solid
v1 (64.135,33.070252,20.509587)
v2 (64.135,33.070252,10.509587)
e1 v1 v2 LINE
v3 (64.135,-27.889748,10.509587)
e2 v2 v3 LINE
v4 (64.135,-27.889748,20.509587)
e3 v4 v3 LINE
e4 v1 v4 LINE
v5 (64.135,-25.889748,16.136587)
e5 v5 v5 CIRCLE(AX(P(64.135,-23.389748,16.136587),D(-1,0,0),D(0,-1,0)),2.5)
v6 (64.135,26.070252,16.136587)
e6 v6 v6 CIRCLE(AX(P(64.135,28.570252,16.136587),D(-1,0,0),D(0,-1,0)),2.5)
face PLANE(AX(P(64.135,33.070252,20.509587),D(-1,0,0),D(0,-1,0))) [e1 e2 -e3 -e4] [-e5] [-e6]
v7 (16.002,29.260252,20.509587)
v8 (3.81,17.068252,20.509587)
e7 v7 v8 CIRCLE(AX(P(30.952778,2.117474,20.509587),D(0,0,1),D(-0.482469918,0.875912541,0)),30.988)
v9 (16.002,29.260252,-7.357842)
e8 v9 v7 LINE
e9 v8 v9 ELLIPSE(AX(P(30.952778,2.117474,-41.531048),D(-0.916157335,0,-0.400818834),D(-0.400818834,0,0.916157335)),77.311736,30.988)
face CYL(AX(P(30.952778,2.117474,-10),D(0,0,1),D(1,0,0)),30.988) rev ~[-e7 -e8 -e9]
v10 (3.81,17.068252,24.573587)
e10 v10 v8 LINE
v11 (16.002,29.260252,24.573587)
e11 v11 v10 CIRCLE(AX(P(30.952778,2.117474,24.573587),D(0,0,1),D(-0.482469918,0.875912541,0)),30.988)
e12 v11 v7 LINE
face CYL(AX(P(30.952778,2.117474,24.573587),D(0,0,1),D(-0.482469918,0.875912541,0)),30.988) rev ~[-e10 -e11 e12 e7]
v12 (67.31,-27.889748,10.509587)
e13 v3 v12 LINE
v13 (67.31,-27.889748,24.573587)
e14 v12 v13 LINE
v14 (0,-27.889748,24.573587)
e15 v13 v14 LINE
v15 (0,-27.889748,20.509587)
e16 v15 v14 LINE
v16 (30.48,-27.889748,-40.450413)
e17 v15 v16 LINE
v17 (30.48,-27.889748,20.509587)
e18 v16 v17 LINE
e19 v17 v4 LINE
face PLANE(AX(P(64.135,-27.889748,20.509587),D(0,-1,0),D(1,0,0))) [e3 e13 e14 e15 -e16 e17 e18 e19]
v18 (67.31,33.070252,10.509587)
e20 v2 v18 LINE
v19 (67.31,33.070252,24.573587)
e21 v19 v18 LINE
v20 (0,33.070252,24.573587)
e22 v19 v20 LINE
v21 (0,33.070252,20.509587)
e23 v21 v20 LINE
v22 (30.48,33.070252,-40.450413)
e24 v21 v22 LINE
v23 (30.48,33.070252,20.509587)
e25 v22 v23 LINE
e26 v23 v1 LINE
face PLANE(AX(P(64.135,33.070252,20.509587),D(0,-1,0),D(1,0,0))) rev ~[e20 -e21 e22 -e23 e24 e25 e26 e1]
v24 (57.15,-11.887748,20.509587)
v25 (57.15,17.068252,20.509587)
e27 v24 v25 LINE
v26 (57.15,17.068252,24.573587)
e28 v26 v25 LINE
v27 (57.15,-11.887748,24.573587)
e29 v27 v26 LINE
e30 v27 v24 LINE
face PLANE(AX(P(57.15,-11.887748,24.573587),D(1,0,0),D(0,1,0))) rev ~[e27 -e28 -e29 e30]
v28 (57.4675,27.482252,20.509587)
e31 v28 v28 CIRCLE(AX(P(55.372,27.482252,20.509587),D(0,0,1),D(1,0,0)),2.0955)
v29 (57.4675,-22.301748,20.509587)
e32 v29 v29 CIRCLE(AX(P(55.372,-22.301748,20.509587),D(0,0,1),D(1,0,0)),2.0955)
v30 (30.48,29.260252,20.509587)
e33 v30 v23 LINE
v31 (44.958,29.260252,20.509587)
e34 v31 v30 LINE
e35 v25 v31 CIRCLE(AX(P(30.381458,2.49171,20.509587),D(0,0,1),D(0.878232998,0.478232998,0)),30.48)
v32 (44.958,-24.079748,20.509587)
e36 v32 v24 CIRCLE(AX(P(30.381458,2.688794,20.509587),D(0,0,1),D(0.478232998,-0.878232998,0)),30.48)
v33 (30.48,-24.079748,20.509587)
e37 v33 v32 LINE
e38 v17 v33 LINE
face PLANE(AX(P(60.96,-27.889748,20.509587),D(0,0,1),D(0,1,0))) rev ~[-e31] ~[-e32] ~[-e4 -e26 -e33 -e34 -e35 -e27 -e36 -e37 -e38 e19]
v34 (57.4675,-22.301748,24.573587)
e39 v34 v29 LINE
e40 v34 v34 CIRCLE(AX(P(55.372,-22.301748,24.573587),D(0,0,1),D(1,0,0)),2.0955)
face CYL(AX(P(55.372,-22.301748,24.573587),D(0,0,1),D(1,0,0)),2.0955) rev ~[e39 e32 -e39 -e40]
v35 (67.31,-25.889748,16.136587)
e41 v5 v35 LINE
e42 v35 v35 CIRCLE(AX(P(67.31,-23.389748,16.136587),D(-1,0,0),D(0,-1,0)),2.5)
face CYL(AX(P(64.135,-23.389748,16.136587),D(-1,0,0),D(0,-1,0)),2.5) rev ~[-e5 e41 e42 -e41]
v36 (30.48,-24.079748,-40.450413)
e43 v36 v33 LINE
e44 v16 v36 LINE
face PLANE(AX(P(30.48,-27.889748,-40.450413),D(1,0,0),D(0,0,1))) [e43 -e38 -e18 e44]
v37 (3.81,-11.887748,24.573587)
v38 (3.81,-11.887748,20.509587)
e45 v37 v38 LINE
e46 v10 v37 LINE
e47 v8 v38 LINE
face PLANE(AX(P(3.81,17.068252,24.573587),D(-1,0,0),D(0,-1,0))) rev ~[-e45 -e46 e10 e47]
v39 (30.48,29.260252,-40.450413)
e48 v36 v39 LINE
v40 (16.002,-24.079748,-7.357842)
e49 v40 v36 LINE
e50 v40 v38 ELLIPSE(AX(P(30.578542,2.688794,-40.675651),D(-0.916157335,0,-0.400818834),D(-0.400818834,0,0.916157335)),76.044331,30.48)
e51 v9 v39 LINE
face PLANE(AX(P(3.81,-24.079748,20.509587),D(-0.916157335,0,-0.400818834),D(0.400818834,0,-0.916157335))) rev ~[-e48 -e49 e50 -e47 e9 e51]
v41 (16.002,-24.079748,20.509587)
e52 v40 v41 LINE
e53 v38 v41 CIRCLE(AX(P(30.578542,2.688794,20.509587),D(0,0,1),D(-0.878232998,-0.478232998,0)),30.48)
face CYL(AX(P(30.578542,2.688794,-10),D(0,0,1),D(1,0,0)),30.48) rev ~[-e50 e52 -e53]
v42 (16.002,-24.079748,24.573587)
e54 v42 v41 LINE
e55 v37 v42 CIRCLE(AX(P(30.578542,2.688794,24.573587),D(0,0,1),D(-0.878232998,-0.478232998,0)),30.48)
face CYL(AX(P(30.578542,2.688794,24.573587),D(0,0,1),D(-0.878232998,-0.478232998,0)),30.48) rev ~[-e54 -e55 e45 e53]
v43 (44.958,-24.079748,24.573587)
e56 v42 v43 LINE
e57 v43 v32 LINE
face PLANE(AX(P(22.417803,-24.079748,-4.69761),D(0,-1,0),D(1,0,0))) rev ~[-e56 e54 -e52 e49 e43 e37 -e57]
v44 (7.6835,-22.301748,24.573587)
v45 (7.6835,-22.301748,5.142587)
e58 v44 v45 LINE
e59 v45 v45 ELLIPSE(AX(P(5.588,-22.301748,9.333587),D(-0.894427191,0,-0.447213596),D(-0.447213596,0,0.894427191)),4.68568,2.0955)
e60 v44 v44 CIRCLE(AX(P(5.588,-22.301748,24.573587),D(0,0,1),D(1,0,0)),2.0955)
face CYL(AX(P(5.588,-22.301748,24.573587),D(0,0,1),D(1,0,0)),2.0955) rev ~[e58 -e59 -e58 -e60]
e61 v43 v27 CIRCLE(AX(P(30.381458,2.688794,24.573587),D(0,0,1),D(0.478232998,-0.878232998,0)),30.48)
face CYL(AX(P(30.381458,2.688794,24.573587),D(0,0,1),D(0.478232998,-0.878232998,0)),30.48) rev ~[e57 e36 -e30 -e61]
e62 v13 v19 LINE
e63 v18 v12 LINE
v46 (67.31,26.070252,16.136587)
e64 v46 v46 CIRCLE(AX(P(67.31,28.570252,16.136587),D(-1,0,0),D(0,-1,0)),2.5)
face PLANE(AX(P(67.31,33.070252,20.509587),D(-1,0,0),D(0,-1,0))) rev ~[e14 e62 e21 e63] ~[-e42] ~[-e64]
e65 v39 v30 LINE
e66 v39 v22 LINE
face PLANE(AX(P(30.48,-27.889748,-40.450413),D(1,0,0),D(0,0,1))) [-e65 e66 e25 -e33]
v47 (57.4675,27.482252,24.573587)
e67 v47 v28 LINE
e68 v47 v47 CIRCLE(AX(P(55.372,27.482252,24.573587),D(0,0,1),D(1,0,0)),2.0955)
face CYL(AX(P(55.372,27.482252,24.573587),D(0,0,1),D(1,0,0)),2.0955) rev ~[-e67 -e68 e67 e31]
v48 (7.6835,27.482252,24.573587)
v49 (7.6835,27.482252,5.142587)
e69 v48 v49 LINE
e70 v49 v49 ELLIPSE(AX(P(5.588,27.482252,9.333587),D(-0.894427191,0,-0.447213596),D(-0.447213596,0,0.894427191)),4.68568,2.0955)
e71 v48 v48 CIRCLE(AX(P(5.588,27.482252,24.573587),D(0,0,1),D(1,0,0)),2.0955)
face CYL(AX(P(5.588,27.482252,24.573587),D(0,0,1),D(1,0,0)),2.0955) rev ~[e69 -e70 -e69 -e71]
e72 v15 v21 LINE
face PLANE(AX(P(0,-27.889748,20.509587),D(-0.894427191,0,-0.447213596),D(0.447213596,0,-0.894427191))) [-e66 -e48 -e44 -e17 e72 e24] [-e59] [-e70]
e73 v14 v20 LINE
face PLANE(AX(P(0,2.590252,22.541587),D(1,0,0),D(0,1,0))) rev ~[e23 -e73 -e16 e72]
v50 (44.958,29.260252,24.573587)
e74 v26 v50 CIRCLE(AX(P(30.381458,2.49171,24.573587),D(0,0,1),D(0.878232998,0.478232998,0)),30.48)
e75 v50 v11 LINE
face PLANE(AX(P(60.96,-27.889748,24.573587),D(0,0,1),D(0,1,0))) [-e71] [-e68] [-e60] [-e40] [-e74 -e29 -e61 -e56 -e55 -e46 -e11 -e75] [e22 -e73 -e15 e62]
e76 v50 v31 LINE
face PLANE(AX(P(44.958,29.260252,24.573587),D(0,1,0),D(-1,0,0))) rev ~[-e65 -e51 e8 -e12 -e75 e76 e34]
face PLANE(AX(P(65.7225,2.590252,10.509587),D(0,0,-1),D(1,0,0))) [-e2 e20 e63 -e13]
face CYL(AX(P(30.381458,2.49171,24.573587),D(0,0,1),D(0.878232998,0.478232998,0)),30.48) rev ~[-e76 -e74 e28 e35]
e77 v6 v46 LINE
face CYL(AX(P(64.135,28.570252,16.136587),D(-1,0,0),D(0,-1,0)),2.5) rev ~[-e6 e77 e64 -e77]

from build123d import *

# Parameters (mm, degrees)
F0_W        = 60.96
F0_H        = 4.064
F1_DEPTH    = 60.96
F3_DEPTH    = 25.4
F6_DEPTH    = 60.96
F7_T4_DEPTH = 53.34
F7_S5_R     = 30.988
F7_T6_DEPTH = 44
F7_S7_R     = 30.48
F7_T8_DEPTH = 44
F8_W        = 60.96
F8_H        = 4.064
F9_DEPTH    = 6.35
F10_W       = 3.175
F10_H       = 60.96
F11_DEPTH   = 10
F4_R        = 2.0955
F14_DEPTH   = 65.025
F13_R       = 2.5
F15_DEPTH   = 25.4
F12_R       = 2.5
F16_DEPTH   = 25.4


# Not quite as in the source:
# - a fillet or chamfer that OpenCascade refuses, or shapes differently, is made with other operations: its cross-section is extruded or revolved along the edge and cut away or added


with BuildPart() as f1:
    # F0 (on Right) → F1 (new body)
    with BuildSketch(Plane.YZ):
        with Locations((2.5902520865, 22.5415869818)):
            Rectangle(F0_W, F0_H)
    extrude(amount=F1_DEPTH)

    # F2 (on face) → F3 (cut)
    with BuildSketch(Plane.XY.offset(24.5735869818)):
        with BuildLine():
            Line((16.002, -24.0797479135), (44.958, -24.0797479135))
            ThreePointArc((44.958, -24.0797479135), (51.934072902, -18.8638208155), (57.15, -11.8877479135))
            Line((57.15, -11.8877479135), (57.15, 17.0682520865))
            ThreePointArc((57.15, 17.0682520865), (51.934072902, 24.0443249885), (44.958, 29.2602520865))
            Line((44.958, 29.2602520865), (16.002, 29.2602520865))
            ThreePointArc((16.002, 29.2602520865), (9.0409528702, 24.0292992163), (3.81, 17.0682520865))
            Line((3.81, 17.0682520865), (3.81, -11.8877479135))
            ThreePointArc((3.81, -11.8877479135), (9.025927098, -18.8638208155), (16.002, -24.0797479135))
        make_face()
    extrude(amount=-F3_DEPTH, mode=Mode.SUBTRACT)

    # F5 (on face) → F6 (join)
    with BuildSketch(Plane.XZ.offset(27.8897479135)):
        Polygon((30.48, -40.4504130182), (30.48, 20.5095869818), (0, 20.5095869818), align=None)
    extrude(amount=-F6_DEPTH)

    # F7: chamfer of 60.96 x 26.67 on 1 edges, made by hand


with BuildPart() as f7_tool2:
    # F7_s3 → F7_t4 (new body)
    with BuildSketch(Plane.XZ.offset(24.0797479135)):
        Polygon((3.81, 20.5095869818), (30.48, -40.4504130182), (30.48, 20.5095869818), align=None)
    extrude(amount=-F7_T4_DEPTH)

    # F7_s5 → F7_t6 (intersect, symmetric)
    with BuildSketch(Plane.XY.offset(-10)):
        with Locations((30.9527778056, 2.1174742809)):
            Circle(F7_S5_R)
    extrude(amount=F7_T6_DEPTH, both=True, mode=Mode.INTERSECT)

    # F7_s7 → F7_t8 (intersect, symmetric)
    with BuildSketch(Plane.XY.offset(-10)):
        with Locations((30.5785417886, 2.6887938751)):
            Circle(F7_S7_R)
    extrude(amount=F7_T8_DEPTH, both=True, mode=Mode.INTERSECT)


with BuildPart() as f1_1:
    add(f1.part)

    # F7_t1: cut F7_tool2
    add(f7_tool2.part, mode=Mode.SUBTRACT)

    # F8 (on face) → F9 (join)
    with BuildSketch(Plane.YZ.offset(60.96)):
        with Locations((2.5902520865, 22.5415869818)):
            Rectangle(F8_W, F8_H)
    extrude(amount=F9_DEPTH)

    # F10 (on face) → F11 (join)
    with BuildSketch(Plane(origin=(0, 0, 20.5095869818), x_dir=(1, 0, 0), z_dir=(0, 0, -1))):
        with Locations((65.7225, -2.5902520865)):
            Rectangle(F10_W, F10_H)
    extrude(amount=F11_DEPTH)

    # F4 (on face) → F14 (cut, through all)
    with BuildSketch(Plane.XY.offset(24.5735869818)):
        with Locations((55.372, -22.3017479135)):
            Circle(F4_R)
        with Locations((55.372, 27.4822520865)):
            Circle(F4_R)
        with Locations((5.588, -22.3017479135)):
            Circle(F4_R)
        with Locations((5.588, 27.4822520865)):
            Circle(F4_R)
    extrude(amount=-F14_DEPTH, mode=Mode.SUBTRACT)

    # F13 (on face) → F15 (cut)
    with BuildSketch(Plane(origin=(64.135, 0, 0), x_dir=(0, -1, 0), z_dir=(-1, 0, 0))):
        with Locations((23.3897479135, 16.1365869818)):
            Circle(F13_R)
    extrude(amount=-F15_DEPTH, mode=Mode.SUBTRACT)

    # F12 (on face) → F16 (cut)
    with BuildSketch(Plane(origin=(64.135, 0, 0), x_dir=(0, -1, 0), z_dir=(-1, 0, 0))):
        with Locations((-28.5702520865, 16.1365869818)):
            Circle(F12_R)
    extrude(amount=-F16_DEPTH, mode=Mode.SUBTRACT)


solid = f1_1.part
